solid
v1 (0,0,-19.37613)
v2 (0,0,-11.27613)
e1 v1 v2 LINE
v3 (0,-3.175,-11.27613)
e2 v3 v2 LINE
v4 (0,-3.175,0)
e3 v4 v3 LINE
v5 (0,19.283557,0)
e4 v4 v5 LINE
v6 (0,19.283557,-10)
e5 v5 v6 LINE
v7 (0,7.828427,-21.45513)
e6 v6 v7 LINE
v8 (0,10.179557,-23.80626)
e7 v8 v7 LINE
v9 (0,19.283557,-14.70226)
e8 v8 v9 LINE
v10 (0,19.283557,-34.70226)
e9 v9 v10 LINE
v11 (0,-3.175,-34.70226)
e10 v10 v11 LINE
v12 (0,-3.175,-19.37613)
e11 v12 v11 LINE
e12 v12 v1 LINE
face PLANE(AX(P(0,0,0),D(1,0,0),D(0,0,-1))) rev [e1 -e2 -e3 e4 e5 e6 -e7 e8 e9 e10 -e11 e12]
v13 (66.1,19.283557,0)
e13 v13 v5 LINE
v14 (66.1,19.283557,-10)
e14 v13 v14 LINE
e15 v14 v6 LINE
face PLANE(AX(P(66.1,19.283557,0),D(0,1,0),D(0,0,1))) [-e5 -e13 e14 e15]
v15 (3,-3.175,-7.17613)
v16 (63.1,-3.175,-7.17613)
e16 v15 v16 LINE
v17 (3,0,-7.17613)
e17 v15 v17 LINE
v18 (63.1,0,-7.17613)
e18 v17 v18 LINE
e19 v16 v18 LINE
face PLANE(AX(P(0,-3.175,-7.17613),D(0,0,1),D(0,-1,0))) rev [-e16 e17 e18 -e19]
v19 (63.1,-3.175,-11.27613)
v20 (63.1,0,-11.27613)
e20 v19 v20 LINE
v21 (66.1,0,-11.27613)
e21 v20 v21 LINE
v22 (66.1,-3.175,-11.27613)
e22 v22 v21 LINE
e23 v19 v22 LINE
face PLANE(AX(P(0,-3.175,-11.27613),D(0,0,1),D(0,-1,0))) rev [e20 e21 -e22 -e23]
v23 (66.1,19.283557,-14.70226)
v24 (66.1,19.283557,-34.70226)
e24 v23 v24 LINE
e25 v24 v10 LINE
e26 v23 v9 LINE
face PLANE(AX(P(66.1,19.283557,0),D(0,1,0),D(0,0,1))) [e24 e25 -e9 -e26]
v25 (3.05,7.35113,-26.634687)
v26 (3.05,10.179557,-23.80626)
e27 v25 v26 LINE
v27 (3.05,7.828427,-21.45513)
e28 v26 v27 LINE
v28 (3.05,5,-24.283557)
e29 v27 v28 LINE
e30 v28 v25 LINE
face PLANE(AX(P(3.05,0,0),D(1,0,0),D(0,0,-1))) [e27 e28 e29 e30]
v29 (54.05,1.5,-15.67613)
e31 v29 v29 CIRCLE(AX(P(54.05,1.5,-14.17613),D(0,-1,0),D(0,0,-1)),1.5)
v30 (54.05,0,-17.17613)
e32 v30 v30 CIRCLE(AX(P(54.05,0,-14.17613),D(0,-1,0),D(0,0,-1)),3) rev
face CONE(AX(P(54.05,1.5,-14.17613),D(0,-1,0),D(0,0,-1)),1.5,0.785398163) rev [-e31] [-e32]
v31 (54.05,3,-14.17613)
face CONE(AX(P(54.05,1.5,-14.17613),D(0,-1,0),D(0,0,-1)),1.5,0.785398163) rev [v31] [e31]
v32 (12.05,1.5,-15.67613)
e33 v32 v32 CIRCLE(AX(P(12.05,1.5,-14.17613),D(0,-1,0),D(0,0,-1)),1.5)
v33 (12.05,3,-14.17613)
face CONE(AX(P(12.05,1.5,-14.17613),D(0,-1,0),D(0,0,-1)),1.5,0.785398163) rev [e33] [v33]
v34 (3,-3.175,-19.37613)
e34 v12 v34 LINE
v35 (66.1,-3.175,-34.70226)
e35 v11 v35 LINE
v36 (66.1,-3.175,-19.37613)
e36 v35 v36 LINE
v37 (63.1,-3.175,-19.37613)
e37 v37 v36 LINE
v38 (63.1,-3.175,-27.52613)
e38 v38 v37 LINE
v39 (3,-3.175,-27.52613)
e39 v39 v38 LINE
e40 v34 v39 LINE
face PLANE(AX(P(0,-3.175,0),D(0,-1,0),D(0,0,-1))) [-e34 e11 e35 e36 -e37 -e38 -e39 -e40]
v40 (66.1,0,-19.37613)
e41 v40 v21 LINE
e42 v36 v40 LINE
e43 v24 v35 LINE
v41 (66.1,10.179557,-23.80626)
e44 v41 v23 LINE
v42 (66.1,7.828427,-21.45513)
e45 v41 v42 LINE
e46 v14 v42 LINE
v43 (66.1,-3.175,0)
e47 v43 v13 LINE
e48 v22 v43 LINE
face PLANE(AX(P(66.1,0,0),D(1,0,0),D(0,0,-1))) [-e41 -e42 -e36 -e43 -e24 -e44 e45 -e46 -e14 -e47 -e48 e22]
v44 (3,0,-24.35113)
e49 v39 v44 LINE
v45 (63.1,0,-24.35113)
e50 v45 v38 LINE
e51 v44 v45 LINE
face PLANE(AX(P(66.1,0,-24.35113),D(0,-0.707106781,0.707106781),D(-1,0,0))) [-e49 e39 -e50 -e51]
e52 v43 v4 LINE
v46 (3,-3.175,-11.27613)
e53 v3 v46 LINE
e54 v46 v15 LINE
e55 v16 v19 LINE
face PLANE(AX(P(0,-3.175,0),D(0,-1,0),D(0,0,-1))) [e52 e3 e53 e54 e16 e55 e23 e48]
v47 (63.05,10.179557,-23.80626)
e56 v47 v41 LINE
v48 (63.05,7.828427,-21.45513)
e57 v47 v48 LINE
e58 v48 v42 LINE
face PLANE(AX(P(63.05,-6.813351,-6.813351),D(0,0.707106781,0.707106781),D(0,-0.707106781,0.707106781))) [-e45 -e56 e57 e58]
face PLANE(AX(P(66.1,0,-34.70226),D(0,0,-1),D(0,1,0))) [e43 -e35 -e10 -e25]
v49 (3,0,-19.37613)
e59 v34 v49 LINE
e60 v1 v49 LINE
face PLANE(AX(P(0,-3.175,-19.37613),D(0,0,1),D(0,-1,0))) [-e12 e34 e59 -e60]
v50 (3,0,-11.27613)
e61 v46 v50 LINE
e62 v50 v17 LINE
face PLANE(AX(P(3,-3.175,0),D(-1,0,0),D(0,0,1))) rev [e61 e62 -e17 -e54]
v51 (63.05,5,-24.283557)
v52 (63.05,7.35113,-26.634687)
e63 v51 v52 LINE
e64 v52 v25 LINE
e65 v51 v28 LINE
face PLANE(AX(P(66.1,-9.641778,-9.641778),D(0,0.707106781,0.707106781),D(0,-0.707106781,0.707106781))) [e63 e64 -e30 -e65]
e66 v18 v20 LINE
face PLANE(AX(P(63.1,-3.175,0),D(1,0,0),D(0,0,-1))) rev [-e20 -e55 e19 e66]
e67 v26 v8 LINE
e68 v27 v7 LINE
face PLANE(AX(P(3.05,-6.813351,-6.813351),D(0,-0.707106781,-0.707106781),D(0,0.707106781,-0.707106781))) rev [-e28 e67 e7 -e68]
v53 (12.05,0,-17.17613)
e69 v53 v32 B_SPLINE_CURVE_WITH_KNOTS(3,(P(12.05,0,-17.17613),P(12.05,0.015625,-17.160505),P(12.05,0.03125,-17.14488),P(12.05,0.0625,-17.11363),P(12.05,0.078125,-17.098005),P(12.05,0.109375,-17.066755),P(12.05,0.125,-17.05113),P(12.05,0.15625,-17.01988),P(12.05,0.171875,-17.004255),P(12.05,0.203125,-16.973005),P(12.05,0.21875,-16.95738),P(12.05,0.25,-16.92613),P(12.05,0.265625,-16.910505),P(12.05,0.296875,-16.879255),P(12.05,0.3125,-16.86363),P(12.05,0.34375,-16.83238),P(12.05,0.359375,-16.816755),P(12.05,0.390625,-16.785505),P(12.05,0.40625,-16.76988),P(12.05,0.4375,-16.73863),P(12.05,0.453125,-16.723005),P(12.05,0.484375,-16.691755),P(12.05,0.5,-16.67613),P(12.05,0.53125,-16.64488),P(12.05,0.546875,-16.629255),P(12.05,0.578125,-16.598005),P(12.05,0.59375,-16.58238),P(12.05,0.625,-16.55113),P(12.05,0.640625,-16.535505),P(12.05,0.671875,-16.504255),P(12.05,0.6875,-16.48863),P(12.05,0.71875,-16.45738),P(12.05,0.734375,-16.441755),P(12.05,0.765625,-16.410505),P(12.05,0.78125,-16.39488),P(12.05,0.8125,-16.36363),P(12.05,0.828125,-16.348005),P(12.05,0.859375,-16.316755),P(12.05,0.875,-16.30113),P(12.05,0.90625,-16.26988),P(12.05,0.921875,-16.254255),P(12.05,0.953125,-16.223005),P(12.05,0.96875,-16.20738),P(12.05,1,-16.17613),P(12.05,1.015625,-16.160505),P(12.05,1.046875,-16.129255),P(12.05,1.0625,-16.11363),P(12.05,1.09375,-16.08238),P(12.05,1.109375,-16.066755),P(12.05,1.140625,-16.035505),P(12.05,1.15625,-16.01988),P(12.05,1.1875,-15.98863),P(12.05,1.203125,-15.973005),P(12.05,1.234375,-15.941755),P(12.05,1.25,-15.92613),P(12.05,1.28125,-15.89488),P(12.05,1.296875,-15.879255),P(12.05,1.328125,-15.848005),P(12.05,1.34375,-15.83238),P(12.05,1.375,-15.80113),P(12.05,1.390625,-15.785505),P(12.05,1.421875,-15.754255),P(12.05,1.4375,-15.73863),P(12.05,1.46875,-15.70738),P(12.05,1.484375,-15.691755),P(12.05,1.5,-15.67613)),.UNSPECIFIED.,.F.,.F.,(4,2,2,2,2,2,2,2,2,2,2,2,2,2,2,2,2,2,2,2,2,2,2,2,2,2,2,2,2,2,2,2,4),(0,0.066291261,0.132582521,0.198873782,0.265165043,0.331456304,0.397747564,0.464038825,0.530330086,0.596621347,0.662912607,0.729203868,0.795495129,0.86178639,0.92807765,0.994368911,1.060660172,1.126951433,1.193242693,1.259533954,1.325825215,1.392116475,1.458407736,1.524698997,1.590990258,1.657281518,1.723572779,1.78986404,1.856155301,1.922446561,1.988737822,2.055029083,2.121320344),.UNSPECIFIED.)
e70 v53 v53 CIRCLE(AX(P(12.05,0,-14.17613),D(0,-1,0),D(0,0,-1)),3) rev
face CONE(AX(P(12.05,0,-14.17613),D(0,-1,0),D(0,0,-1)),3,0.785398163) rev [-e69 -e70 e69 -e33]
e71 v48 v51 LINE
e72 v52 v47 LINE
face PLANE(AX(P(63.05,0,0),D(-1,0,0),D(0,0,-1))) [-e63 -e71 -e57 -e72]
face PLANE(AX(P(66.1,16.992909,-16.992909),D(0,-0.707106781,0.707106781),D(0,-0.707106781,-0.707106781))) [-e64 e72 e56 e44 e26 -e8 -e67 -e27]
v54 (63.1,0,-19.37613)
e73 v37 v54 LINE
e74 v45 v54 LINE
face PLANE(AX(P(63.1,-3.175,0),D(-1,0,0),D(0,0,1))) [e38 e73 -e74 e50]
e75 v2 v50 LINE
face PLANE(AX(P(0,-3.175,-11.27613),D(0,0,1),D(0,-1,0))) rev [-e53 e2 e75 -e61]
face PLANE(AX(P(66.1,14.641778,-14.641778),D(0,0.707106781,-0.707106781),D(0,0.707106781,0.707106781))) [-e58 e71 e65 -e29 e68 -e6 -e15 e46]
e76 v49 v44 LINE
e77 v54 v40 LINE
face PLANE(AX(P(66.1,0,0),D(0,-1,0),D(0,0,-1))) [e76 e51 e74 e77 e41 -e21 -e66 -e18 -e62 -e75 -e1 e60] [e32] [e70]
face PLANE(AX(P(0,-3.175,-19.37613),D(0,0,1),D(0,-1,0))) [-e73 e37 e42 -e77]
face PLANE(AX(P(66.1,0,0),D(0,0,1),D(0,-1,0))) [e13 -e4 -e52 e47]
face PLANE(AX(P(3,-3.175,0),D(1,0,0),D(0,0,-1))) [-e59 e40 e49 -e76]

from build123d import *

# Parameters (mm, degrees)
BOSS_EXTRUDE1_DEPTH = 66.1
BOSS_EXTRUDE2_DEPTH = 3.05
BOSS_EXTRUDE3_DEPTH = 3.175
SKETCH2_4_R         = 1.5
CUT_EXTRUDE1_DEPTH  = 3
CHAMFER1_SIZE       = 1.5
CHAMFER3_SIZE       = 3.175


with BuildPart() as part:
    # Sketch1 → Boss-Extrude1 (new body)
    with BuildSketch(Plane(origin=(0, 0, 0), x_dir=(0, 0, -1), z_dir=(1, 0, 0))):
        Polygon((14.702260095, 19.28355698), (34.702260095, 19.28355698), (34.702260095, 0), (0, 0), (0, 19.28355698), (10, 19.28355698), (24.28355698, 5), (26.634687027, 7.351130047), align=None)
    extrude(amount=BOSS_EXTRUDE1_DEPTH)

    # Sketch1<4> → Boss-Extrude2 (add)
    with BuildSketch(Plane(origin=(0, 0, 0), x_dir=(0, 0, -1), z_dir=(1, 0, 0))):
        Polygon((23.806259903, 10.179557172), (21.455129855, 7.828427125), (24.28355698, 5), (26.634687027, 7.351130047), align=None)
    boss_extrude2 = extrude(amount=BOSS_EXTRUDE2_DEPTH)

    # Mirror1: Boss-Extrude2 across plane
    add(boss_extrude2.mirror(Plane.ZY.offset(-33.05)))

    # Sketch2 → Boss-Extrude3 (add)
    with BuildSketch(Plane(origin=(0, 0, 0), x_dir=(1, 0, 0), z_dir=(0, 1, 0))):
        Polygon((0, 11.276130047), (0, 0), (66.1, 0), (66.1, 11.276130047), (63.1, 11.276130047), (63.1, 7.176130047), (3, 7.176130047), (3, 11.276130047), align=None)
        Polygon((0, 34.702260095), (0, 19.376130047), (3, 19.376130047), (3, 27.526130047), (63.1, 27.526130047), (63.1, 19.376130047), (66.1, 19.376130047), (66.1, 34.702260095), align=None)
    extrude(amount=-BOSS_EXTRUDE3_DEPTH)

    # Sketch2<4> → Cut-Extrude1 (cut)
    with BuildSketch(Plane(origin=(0, 0, 0), x_dir=(1, 0, 0), z_dir=(0, 1, 0))):
        with Locations(Location((54.05, 14.176130047, 0), (0, 0, 90))):
            Circle(SKETCH2_4_R)
        with Locations(Location((12.05, 14.176130047, 0), (0, 0, 90))):
            Circle(SKETCH2_4_R)
    extrude(amount=CUT_EXTRUDE1_DEPTH, mode=Mode.SUBTRACT)

    # Chamfer1
    chamfer1_edges = [part.edges().sort_by_distance(p)[0] for p in [
        (54.05, 3, -12.676130047),
        (54.05, 0, -12.676130047),
        (12.05, 0, -12.676130047),
        (12.05, 3, -12.676130047),
    ]]
    chamfer(chamfer1_edges, length=CHAMFER1_SIZE - 0.0001)  # a hair under: the kernel refuses the full size

    # Chamfer3
    chamfer3_edges = [part.edges().sort_by_distance(p)[0] for p in [
        (33.05, 0, -27.526130047),
    ]]
    chamfer(chamfer3_edges, length=CHAMFER3_SIZE - 0.0001)  # a hair under: the kernel refuses the full size


solid = part.part
